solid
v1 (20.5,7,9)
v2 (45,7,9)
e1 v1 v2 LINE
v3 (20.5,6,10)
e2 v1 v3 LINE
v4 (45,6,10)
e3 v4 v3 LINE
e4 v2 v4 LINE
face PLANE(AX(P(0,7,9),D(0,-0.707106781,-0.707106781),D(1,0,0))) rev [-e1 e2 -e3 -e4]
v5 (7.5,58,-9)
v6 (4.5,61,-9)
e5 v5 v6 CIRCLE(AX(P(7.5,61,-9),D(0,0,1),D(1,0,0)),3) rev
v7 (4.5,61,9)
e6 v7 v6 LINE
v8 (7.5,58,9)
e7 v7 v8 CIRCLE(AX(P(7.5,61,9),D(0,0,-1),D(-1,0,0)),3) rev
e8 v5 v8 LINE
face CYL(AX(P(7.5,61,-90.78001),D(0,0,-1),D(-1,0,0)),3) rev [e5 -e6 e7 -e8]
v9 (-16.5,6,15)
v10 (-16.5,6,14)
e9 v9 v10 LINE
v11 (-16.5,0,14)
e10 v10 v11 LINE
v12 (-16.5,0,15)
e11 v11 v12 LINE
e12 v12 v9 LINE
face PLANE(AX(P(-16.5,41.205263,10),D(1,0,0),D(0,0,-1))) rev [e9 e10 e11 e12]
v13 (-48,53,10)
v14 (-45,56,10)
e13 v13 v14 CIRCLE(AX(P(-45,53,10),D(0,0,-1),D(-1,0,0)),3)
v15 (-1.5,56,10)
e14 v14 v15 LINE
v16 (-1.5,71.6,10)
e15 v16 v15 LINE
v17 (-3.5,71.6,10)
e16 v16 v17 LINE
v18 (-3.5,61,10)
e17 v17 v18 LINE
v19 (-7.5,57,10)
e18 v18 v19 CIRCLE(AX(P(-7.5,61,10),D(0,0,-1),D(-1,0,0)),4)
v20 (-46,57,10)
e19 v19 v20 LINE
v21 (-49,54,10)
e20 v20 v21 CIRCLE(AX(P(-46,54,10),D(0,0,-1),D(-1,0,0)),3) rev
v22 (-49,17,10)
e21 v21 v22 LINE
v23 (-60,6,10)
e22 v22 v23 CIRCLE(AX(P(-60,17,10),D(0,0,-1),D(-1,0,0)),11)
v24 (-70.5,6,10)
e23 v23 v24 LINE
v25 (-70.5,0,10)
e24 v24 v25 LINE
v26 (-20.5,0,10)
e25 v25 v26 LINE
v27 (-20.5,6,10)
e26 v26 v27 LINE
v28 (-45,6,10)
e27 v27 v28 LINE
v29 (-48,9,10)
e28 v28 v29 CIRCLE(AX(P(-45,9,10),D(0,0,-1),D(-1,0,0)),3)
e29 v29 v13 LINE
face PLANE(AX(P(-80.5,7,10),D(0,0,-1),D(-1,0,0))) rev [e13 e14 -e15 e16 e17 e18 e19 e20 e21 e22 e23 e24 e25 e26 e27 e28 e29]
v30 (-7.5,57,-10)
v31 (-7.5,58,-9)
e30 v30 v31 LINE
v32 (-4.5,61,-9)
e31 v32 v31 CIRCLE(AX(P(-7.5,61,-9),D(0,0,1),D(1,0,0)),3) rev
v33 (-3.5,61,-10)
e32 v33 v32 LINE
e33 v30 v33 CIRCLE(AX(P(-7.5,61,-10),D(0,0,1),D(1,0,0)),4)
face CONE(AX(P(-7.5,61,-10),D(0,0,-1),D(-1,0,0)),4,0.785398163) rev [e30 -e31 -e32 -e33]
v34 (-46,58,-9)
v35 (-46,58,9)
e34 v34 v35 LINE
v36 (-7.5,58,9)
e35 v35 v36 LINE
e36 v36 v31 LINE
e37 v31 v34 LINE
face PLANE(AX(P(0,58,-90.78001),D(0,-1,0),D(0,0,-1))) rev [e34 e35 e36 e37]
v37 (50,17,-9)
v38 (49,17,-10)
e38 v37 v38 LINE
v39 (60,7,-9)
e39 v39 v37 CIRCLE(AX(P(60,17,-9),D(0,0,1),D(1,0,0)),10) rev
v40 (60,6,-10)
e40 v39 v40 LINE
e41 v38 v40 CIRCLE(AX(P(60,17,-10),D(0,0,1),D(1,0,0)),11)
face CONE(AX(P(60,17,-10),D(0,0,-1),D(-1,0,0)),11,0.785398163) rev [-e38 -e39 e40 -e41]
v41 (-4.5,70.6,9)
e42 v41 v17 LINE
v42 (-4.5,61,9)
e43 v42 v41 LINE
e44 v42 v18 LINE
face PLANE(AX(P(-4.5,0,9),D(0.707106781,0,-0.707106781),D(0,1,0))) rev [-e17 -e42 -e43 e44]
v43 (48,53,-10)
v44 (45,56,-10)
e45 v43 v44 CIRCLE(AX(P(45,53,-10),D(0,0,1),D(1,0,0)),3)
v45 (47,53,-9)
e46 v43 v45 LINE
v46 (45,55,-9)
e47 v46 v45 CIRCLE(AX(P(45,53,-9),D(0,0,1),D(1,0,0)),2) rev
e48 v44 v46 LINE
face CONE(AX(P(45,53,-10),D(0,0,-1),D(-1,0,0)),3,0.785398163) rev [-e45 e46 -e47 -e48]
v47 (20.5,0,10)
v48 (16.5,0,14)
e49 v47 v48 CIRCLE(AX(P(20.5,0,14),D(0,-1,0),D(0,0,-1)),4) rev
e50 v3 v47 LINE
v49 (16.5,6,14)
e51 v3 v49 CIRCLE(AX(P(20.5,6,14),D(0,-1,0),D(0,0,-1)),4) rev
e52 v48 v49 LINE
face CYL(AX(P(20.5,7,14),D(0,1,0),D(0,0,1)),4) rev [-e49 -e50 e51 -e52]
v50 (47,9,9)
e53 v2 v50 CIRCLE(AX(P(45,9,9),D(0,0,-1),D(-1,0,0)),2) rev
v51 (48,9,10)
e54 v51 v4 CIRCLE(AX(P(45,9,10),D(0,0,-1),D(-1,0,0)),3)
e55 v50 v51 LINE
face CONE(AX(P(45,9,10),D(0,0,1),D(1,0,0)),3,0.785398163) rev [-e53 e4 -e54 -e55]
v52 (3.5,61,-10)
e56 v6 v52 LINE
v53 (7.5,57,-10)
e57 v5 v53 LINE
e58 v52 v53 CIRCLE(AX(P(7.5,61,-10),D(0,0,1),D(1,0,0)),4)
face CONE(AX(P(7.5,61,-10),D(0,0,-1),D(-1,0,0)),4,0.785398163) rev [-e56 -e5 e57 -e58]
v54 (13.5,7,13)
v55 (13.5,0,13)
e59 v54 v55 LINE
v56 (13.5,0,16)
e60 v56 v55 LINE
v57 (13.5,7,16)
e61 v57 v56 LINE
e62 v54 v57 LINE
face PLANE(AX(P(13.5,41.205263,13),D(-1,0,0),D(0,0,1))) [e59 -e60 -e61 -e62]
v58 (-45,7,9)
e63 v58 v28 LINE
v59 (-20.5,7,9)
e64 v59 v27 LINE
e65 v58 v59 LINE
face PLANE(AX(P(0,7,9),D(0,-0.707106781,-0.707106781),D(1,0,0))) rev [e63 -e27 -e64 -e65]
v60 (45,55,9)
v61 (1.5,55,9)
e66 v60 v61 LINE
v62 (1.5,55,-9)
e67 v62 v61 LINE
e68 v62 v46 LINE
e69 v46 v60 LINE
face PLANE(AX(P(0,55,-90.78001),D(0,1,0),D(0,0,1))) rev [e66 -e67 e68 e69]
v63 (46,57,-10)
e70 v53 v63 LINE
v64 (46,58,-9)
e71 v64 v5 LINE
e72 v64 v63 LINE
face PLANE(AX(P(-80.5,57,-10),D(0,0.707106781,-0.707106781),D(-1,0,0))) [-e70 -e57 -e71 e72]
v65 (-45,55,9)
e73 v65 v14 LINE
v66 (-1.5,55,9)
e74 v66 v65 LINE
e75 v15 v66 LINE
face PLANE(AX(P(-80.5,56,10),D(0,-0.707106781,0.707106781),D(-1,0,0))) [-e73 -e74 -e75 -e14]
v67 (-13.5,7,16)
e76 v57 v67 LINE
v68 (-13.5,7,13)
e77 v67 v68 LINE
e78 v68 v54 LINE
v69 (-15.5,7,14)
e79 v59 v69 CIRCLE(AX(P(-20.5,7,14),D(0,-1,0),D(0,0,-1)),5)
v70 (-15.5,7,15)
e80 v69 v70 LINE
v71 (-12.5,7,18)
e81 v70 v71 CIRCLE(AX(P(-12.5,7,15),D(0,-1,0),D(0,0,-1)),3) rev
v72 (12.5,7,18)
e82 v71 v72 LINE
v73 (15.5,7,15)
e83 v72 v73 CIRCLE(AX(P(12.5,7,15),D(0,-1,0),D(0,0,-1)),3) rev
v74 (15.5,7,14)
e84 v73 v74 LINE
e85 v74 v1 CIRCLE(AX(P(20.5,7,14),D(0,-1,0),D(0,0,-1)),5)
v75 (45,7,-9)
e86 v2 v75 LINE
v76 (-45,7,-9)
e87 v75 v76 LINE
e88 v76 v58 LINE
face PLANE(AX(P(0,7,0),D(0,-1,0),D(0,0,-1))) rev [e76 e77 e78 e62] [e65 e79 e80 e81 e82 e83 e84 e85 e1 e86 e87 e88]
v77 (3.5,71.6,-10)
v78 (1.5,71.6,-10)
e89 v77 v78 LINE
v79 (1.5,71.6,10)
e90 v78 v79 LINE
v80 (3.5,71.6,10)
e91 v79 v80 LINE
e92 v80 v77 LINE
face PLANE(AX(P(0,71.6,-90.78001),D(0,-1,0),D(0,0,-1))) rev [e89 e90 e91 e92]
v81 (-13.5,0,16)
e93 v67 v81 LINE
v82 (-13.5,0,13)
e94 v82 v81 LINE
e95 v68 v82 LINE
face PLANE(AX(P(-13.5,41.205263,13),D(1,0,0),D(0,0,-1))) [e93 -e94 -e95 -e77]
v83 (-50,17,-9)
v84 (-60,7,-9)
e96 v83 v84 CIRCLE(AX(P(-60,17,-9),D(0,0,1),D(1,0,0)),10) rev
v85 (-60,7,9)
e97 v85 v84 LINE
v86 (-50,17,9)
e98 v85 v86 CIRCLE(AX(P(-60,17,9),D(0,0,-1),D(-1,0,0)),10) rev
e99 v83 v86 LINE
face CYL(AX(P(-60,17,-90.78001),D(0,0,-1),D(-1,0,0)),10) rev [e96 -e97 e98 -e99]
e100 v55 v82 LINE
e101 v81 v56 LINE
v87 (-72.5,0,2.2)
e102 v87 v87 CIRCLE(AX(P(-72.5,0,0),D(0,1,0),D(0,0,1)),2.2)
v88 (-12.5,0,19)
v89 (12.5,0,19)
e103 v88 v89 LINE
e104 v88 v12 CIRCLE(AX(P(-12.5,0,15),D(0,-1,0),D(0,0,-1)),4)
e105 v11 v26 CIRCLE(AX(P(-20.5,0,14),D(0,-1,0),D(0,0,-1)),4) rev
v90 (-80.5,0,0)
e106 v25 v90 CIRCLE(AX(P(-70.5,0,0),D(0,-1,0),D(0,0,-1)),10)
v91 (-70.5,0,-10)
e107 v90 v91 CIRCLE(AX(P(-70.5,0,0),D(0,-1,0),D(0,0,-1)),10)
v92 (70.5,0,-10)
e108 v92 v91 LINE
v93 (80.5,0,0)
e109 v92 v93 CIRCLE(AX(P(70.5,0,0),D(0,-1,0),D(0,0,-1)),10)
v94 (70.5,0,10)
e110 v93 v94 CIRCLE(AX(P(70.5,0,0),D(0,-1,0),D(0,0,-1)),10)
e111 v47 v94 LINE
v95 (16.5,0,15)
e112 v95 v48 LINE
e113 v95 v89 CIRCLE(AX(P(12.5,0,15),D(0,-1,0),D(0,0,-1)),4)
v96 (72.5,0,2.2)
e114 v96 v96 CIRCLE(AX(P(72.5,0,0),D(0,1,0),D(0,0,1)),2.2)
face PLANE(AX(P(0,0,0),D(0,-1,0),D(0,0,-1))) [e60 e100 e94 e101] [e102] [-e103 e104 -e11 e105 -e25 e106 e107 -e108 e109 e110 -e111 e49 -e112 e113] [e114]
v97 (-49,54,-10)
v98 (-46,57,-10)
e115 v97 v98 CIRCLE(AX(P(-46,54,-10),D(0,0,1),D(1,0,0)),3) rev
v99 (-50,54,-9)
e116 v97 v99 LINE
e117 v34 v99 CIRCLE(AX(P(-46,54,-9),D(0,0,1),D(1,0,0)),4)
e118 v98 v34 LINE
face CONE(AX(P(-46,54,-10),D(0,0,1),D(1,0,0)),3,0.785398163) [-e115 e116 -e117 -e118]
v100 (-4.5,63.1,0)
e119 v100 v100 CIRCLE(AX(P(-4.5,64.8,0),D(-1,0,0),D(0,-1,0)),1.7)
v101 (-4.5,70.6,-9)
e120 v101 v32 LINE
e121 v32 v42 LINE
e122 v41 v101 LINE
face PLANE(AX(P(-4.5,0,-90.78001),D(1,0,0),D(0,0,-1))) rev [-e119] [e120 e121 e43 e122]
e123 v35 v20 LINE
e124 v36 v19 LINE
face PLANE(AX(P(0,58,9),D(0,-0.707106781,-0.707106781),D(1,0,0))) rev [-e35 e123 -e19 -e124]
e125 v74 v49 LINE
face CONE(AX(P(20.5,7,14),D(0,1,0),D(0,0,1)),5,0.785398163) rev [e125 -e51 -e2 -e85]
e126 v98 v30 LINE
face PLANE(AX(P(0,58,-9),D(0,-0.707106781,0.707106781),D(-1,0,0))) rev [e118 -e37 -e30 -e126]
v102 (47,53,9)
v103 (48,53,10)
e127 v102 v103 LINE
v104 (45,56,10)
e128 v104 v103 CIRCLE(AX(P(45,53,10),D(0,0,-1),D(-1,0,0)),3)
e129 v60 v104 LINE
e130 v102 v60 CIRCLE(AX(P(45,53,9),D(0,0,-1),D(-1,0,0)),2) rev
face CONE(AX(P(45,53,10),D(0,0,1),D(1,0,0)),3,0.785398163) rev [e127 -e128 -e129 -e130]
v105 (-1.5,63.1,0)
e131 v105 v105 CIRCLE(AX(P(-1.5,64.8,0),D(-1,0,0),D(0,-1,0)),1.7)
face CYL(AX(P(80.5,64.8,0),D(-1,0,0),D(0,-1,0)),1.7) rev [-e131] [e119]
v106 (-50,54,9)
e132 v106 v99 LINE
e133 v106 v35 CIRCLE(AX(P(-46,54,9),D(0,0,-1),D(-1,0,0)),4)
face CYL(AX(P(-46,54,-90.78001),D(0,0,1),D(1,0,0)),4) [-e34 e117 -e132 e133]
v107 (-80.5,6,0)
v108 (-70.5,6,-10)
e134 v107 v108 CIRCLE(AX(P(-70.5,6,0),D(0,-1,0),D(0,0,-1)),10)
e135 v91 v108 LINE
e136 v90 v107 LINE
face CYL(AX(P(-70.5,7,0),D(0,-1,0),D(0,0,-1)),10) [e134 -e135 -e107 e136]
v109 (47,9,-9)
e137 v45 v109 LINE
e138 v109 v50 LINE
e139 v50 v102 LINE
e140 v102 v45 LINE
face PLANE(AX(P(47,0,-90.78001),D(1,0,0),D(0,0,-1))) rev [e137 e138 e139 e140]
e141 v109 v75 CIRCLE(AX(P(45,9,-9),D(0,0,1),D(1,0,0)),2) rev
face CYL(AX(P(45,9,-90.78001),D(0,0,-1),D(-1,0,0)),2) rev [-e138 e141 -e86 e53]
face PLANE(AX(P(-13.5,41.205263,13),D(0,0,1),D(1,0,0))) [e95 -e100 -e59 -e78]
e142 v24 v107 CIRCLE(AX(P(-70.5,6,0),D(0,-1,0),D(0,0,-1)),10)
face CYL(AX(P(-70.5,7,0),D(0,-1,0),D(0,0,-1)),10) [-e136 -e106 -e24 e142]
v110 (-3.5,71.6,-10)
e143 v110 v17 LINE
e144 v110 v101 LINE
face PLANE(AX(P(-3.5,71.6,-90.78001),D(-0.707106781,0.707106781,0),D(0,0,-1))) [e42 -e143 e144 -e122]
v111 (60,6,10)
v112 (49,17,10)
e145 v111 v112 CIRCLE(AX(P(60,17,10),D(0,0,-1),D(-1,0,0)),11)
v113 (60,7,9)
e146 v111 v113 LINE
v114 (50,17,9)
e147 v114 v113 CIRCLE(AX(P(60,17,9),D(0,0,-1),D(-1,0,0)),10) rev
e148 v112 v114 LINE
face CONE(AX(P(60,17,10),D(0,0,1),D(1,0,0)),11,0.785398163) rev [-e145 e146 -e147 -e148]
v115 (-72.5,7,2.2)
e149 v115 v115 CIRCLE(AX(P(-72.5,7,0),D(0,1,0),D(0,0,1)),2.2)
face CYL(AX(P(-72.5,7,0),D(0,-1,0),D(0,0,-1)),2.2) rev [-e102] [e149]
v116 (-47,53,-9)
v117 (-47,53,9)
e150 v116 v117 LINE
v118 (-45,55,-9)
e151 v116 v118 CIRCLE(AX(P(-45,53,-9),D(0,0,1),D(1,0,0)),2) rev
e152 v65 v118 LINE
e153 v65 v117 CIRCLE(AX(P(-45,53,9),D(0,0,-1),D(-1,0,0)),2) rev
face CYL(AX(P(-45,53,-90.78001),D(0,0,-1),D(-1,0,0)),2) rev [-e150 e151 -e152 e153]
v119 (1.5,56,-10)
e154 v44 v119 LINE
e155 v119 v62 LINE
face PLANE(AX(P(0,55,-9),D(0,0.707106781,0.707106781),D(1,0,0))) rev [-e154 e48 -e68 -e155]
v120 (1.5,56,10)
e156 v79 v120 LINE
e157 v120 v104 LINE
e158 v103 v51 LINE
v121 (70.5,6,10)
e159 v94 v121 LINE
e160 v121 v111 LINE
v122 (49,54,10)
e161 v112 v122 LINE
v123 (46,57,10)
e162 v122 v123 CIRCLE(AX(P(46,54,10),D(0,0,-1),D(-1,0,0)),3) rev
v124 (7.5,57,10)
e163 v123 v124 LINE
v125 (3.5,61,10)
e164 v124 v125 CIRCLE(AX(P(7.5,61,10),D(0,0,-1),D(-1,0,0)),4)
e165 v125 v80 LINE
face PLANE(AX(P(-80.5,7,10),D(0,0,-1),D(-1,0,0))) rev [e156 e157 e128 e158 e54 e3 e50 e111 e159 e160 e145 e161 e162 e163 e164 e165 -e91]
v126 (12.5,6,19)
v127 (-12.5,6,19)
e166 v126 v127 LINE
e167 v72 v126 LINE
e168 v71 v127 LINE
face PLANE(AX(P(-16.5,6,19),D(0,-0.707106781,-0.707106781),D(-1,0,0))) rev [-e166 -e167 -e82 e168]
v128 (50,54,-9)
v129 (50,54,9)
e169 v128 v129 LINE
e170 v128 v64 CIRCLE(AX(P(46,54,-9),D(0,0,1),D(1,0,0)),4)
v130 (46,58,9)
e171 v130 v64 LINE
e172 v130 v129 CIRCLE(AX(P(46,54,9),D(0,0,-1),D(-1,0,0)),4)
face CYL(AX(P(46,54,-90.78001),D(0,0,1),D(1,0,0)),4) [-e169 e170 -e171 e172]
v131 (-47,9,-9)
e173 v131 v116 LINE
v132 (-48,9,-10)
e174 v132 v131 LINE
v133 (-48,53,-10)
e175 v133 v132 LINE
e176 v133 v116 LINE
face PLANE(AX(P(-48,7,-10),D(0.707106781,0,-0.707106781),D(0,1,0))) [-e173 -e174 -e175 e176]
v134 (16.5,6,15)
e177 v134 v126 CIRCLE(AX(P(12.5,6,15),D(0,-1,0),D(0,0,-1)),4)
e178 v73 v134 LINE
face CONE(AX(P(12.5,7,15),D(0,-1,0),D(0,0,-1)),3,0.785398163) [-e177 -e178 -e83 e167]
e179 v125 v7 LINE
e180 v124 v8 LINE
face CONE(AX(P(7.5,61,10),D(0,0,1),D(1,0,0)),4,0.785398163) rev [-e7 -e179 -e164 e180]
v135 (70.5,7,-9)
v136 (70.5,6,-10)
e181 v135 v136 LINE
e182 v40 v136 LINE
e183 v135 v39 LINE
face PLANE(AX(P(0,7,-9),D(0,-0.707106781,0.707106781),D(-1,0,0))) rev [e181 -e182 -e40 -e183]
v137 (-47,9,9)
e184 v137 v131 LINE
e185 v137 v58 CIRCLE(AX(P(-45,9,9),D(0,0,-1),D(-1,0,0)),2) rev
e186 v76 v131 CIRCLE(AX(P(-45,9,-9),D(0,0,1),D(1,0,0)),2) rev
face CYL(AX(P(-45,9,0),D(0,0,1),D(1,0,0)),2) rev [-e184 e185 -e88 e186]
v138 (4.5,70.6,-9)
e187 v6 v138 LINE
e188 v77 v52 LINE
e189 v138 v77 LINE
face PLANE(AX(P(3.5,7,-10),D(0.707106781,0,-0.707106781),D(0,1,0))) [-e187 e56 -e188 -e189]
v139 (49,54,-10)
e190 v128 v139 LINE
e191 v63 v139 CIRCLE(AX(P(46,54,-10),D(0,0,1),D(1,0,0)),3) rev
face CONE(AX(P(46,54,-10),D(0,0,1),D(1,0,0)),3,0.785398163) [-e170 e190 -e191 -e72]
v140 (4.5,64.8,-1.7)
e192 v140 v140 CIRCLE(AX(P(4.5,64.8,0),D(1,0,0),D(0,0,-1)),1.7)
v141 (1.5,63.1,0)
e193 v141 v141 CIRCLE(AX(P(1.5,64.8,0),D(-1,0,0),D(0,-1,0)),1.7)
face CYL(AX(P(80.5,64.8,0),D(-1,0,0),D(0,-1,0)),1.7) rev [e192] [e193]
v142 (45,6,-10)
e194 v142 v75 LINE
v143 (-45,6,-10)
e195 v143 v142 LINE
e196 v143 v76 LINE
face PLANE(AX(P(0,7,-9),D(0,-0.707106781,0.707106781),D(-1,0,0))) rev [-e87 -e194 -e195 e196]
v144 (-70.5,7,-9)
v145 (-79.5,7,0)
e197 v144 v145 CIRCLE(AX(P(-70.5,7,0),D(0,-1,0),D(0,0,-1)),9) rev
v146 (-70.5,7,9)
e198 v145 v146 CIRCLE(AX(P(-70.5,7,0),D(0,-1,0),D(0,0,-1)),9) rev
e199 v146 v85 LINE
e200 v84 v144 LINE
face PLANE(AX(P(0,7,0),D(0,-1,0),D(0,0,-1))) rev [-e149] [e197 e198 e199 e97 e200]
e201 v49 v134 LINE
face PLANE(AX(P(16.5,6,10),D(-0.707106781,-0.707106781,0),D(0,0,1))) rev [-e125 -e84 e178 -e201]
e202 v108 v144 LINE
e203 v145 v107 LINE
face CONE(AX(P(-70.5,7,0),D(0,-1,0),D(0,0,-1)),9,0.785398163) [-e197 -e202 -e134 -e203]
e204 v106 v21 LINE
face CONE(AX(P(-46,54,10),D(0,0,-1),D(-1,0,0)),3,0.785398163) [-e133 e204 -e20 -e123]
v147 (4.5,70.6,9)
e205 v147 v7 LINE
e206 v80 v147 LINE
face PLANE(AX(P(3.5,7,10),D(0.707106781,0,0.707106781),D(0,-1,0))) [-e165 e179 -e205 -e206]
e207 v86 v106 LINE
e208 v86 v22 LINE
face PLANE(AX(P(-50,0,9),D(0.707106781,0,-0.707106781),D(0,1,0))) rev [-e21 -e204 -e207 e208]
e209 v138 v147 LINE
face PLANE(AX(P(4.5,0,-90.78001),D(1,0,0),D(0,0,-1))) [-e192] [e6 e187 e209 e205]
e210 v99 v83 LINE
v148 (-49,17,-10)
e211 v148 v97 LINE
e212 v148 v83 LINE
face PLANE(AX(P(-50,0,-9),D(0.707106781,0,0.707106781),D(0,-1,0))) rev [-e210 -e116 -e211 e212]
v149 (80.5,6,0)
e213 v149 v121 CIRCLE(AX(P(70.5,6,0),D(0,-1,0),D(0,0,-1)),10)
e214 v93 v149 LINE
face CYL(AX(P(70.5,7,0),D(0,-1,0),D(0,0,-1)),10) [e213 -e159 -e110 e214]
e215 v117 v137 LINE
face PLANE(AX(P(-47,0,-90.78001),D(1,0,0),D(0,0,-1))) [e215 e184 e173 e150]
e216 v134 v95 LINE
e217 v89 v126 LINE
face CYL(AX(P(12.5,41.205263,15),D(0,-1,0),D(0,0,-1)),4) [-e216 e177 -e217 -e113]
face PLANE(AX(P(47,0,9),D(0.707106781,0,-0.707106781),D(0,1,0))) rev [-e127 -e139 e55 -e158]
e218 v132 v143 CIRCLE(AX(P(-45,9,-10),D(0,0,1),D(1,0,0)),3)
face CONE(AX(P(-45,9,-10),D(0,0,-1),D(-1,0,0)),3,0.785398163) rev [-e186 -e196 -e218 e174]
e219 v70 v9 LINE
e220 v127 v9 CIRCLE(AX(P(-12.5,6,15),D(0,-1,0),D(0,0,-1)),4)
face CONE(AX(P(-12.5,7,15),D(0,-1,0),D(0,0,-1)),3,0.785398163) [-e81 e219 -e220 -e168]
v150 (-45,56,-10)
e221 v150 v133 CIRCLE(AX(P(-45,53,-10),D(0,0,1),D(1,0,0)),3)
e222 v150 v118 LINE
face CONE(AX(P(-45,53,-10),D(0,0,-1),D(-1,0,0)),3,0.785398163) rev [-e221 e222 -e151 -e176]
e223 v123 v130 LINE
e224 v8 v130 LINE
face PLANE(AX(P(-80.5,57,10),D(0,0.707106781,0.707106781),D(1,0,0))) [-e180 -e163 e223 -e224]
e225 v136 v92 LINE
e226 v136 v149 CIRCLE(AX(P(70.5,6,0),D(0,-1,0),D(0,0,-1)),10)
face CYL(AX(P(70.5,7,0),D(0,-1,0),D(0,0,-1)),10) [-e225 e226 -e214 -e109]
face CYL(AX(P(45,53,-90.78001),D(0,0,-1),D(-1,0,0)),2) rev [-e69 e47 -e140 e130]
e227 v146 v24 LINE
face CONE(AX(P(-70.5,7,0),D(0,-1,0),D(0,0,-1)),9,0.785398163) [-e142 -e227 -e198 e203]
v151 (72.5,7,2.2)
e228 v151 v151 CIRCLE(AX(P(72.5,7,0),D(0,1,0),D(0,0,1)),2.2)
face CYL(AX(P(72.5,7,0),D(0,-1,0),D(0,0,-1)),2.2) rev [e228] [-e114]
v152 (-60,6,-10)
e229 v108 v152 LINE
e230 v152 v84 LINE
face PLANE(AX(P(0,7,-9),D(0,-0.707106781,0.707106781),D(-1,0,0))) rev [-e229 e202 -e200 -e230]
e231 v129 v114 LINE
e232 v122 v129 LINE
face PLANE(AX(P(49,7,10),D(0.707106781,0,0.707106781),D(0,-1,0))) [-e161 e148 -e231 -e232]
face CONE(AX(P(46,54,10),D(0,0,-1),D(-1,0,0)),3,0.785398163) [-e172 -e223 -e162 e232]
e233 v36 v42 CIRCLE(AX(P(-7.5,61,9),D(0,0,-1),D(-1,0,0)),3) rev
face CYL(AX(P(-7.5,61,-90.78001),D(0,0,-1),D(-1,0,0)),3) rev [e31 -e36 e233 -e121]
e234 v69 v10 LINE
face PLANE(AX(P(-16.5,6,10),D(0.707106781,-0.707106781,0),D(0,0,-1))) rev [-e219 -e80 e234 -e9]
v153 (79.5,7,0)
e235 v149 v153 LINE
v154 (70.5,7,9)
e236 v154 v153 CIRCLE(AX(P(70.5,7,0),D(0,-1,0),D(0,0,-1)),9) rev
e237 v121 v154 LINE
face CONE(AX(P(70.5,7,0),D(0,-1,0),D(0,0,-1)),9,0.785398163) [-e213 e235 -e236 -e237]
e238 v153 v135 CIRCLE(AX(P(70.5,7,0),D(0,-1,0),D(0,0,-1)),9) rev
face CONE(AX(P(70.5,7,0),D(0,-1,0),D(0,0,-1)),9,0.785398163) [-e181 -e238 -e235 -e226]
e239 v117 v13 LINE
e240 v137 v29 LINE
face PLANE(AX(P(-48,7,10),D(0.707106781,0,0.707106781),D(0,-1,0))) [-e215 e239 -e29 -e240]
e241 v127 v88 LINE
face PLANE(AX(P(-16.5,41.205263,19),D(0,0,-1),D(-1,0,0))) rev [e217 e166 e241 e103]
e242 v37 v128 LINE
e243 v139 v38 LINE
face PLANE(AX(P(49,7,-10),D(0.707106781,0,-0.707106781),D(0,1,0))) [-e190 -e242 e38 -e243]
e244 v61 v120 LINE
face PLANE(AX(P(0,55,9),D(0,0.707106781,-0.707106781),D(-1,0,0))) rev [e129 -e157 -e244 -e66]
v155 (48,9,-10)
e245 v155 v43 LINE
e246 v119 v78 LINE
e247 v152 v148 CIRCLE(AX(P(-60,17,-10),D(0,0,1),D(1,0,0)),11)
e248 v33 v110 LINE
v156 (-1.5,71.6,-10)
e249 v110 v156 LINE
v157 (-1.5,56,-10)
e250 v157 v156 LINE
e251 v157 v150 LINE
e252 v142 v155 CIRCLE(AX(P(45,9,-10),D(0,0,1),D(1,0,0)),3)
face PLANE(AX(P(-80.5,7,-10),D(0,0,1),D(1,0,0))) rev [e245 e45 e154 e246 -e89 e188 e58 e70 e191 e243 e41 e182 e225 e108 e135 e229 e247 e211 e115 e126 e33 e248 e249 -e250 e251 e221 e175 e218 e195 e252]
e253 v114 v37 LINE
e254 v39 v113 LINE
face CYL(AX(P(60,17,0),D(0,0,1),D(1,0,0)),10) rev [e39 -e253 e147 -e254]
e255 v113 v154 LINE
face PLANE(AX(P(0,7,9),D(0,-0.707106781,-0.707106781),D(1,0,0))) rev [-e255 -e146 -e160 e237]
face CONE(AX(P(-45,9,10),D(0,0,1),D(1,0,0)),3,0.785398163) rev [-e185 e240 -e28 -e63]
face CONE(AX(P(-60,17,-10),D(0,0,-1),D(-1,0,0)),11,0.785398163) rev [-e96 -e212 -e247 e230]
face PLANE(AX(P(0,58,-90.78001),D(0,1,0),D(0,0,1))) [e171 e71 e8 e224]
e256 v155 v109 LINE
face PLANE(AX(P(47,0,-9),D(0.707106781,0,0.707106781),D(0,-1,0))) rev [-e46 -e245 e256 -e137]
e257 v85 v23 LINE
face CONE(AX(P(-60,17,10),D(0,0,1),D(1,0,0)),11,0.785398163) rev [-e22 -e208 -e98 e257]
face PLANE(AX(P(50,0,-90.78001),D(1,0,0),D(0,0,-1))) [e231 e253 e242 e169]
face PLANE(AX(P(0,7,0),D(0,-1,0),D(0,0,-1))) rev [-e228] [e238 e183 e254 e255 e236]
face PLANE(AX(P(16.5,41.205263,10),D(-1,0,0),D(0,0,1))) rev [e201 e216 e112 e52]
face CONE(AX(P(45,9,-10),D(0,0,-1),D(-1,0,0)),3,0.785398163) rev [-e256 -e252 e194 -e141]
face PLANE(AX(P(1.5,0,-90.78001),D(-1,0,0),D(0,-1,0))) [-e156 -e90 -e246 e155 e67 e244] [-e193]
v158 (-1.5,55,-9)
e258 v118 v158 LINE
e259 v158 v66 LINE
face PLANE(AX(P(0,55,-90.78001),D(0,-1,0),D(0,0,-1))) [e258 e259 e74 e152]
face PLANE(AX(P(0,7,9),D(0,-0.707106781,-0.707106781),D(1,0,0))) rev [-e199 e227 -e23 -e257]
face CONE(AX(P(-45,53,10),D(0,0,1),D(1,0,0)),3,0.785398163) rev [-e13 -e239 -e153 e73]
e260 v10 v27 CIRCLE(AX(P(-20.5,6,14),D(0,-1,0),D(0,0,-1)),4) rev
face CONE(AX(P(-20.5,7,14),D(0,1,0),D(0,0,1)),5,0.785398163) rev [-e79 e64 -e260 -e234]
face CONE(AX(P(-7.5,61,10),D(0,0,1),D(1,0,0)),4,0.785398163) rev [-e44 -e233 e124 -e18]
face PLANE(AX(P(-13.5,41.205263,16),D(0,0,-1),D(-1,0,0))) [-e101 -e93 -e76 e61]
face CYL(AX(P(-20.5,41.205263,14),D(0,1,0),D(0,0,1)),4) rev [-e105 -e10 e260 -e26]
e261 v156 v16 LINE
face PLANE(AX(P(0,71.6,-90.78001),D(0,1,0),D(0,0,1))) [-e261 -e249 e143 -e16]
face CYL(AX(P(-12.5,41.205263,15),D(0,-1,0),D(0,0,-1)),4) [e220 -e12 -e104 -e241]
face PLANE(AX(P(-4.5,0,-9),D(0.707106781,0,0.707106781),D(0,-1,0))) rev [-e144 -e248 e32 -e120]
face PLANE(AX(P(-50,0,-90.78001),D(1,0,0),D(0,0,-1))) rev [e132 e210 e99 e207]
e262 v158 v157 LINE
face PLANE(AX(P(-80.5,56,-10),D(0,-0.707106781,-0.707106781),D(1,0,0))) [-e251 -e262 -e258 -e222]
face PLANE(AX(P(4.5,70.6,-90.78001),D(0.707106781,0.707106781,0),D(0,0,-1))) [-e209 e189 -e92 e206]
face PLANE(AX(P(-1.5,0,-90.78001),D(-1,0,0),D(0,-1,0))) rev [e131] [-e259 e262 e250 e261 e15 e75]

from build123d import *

# Parameters (mm, degrees)
SKETCH1_W           = 161
SKETCH1_H           = 20
SKETCH1_R           = 2.2
BOSS_EXTRUDE1_DEPTH = 7
BOSS_EXTRUDE2_DEPTH = 20
SKETCH4_W           = 33
SKETCH4_H           = 9
SKETCH4_W_2         = 27
SKETCH4_H_2         = 3
BOSS_EXTRUDE3_DEPTH = 7
SKETCH5_R           = 1.7
CUT_EXTRUDE1_DEPTH  = 113.749988914
FILLET1_R           = 2
FILLET2_R           = 10
FILLET3_R           = 3
FILLET4_R           = 4
FILLET5_R           = 4
CHAMFER1_SIZE       = 1


with BuildPart() as part:
    # Sketch1 → Boss-Extrude1 (new body)
    with BuildSketch(Plane(origin=(0, 0, 0), x_dir=(1, 0, 0), z_dir=(0, 1, 0))):
        Rectangle(SKETCH1_W, SKETCH1_H)
        with Locations(Location((-72.5, 0, 0), (0, 0, 270))):
            Circle(SKETCH1_R, mode=Mode.SUBTRACT)
        with Locations(Location((72.5, 0, 0), (0, 0, 270))):
            Circle(SKETCH1_R, mode=Mode.SUBTRACT)
    extrude(amount=BOSS_EXTRUDE1_DEPTH)

    # Sketch2 → Boss-Extrude2 (add)
    with BuildSketch(Plane.XY.offset(10)):
        Polygon((47, 55), (47, 7), (50, 7), (50, 58), (4.5, 58), (4.5, 71.6), (1.5, 71.6), (1.5, 55), align=None)
        Polygon((-50, 58), (-50, 7), (-47, 7), (-47, 55), (-1.5, 55), (-1.5, 71.6), (-4.5, 71.6), (-4.5, 58), align=None)
    extrude(amount=-BOSS_EXTRUDE2_DEPTH)

    # Sketch4 → Boss-Extrude3 (add)
    with BuildSketch(Plane(origin=(0, 0, 0), x_dir=(1, 0, 0), z_dir=(0, 1, 0))):
        with Locations((0, -14.5)):
            Rectangle(SKETCH4_W, SKETCH4_H)
        with Locations((0, -14.5)):
            Rectangle(SKETCH4_W_2, SKETCH4_H_2, mode=Mode.SUBTRACT)
    extrude(amount=BOSS_EXTRUDE3_DEPTH)

    # Sketch5 → Cut-Extrude1 (cut, through all)
    with BuildSketch(Plane.ZY.offset(4.5)):
        with Locations(Location((0, 64.8, 0), (0, 0, 270))):
            Circle(SKETCH5_R)
    extrude(amount=-CUT_EXTRUDE1_DEPTH, mode=Mode.SUBTRACT)

    # Fillet1
    fillet1_edges = [part.edges().sort_by_distance(p)[0] for p in [
        (47, 55, 0),
        (47, 7, 0),
        (-47, 55, 0),
        (-47, 7, 0),
    ]]
    fillet(fillet1_edges, radius=FILLET1_R)

    # Fillet2
    fillet2_edges = [part.edges().sort_by_distance(p)[0] for p in [
        (50, 7, 0),
        (-50, 7, 0),
        (80.5, 3.5, 10),
        (-80.5, 3.5, 10),
        (-80.5, 3.5, -10),
        (80.5, 3.5, -10),
    ]]
    fillet(fillet2_edges, radius=FILLET2_R - 0.0001)  # a hair under: the kernel refuses the full size

    # Fillet3
    fillet3_edges = [part.edges().sort_by_distance(p)[0] for p in [
        (4.5, 58, 0),
        (-4.5, 58, 0),
    ]]
    fillet(fillet3_edges, radius=FILLET3_R)

    # Fillet4
    fillet4_edges = [part.edges().sort_by_distance(p)[0] for p in [
        (-16.5, 3.5, 10),
        (-16.5, 3.5, 19),
        (16.5, 3.5, 19),
        (16.5, 3.5, 10),
    ]]
    fillet(fillet4_edges, radius=FILLET4_R)

    # Fillet5
    fillet5_edges = [part.edges().sort_by_distance(p)[0] for p in [
        (50, 58, 0),
        (-50, 58, 0),
    ]]
    fillet(fillet5_edges, radius=FILLET5_R)

    # Chamfer1
    chamfer1_edges = [part.edges().sort_by_distance(p)[0] for p in [
        (46.414213562, 54.414213562, 10),
        (46.414213562, 54.414213562, -10),
        (46.414213562, 7.585786438, 10),
        (46.414213562, 7.585786438, -10),
        (-46.414213562, 7.585786438, 10),
        (-46.414213562, 7.585786438, -10),
        (-46.414213562, 54.414213562, 10),
        (-46.414213562, 54.414213562, -10),
        (65.25, 7, -10),
        (65.25, 7, 10),
        (77.571097101, 7, -7.071097101),
        (77.571097101, 7, 7.071097101),
        (50, 35.49995, 10),
        (-50, 35.49995, 10),
        (-65.25, 7, -10),
        (-65.25, 7, 10),
        (-77.571097101, 7, 7.071097101),
        (-77.571097101, 7, -7.071097101),
        (52.928902899, 9.928902899, 10),
        (52.928902899, 9.928902899, -10),
        (-52.928902899, 9.928902899, 10),
        (-52.928902899, 9.928902899, -10),
        (26.75, 58, -10),
        (4.5, 66.3, 10),
        (-4.5, 66.3, 10),
        (-26.75, 58, -10),
        (5.378679656, 58.878679656, 10),
        (5.378679656, 58.878679656, -10),
        (-5.378679656, 58.878679656, 10),
        (-5.378679656, 58.878679656, -10),
        (0, 7, 19),
        (-16.5, 7, 14.5),
        (32.75, 7, 10),
        (16.5, 7, 14.5),
        (15.328427125, 7, 17.828427125),
        (-15.328427125, 7, 17.828427125),
        (-17.671572875, 7, 11.171572875),
        (17.671572875, 7, 11.171572875),
        (50, 35.49995, -10),
        (26.75, 58, 10),
        (48.828427125, 56.828427125, 10),
        (-50, 35.49995, -10),
        (-48.828427125, 56.828427125, -10),
        (48.828427125, 56.828427125, -10),
        (-26.75, 58, 10),
        (-48.828427125, 56.828427125, 10),
        (4.5, 71.6, 0),
        (23.25, 55, -10),
        (4.5, 66.3, -10),
        (-4.5, 66.3, -10),
        (-4.5, 71.6, 0),
        (-23.25, 55, -10),
        (23.25, 55, 10),
        (47, 31, -10),
        (47, 31, 10),
        (0, 7, -10),
        (-32.75, 7, 10),
        (-47, 31, -10),
        (-47, 31, 10),
        (-23.25, 55, 10),
    ]]
    chamfer(chamfer1_edges, length=CHAMFER1_SIZE)


solid = part.part
